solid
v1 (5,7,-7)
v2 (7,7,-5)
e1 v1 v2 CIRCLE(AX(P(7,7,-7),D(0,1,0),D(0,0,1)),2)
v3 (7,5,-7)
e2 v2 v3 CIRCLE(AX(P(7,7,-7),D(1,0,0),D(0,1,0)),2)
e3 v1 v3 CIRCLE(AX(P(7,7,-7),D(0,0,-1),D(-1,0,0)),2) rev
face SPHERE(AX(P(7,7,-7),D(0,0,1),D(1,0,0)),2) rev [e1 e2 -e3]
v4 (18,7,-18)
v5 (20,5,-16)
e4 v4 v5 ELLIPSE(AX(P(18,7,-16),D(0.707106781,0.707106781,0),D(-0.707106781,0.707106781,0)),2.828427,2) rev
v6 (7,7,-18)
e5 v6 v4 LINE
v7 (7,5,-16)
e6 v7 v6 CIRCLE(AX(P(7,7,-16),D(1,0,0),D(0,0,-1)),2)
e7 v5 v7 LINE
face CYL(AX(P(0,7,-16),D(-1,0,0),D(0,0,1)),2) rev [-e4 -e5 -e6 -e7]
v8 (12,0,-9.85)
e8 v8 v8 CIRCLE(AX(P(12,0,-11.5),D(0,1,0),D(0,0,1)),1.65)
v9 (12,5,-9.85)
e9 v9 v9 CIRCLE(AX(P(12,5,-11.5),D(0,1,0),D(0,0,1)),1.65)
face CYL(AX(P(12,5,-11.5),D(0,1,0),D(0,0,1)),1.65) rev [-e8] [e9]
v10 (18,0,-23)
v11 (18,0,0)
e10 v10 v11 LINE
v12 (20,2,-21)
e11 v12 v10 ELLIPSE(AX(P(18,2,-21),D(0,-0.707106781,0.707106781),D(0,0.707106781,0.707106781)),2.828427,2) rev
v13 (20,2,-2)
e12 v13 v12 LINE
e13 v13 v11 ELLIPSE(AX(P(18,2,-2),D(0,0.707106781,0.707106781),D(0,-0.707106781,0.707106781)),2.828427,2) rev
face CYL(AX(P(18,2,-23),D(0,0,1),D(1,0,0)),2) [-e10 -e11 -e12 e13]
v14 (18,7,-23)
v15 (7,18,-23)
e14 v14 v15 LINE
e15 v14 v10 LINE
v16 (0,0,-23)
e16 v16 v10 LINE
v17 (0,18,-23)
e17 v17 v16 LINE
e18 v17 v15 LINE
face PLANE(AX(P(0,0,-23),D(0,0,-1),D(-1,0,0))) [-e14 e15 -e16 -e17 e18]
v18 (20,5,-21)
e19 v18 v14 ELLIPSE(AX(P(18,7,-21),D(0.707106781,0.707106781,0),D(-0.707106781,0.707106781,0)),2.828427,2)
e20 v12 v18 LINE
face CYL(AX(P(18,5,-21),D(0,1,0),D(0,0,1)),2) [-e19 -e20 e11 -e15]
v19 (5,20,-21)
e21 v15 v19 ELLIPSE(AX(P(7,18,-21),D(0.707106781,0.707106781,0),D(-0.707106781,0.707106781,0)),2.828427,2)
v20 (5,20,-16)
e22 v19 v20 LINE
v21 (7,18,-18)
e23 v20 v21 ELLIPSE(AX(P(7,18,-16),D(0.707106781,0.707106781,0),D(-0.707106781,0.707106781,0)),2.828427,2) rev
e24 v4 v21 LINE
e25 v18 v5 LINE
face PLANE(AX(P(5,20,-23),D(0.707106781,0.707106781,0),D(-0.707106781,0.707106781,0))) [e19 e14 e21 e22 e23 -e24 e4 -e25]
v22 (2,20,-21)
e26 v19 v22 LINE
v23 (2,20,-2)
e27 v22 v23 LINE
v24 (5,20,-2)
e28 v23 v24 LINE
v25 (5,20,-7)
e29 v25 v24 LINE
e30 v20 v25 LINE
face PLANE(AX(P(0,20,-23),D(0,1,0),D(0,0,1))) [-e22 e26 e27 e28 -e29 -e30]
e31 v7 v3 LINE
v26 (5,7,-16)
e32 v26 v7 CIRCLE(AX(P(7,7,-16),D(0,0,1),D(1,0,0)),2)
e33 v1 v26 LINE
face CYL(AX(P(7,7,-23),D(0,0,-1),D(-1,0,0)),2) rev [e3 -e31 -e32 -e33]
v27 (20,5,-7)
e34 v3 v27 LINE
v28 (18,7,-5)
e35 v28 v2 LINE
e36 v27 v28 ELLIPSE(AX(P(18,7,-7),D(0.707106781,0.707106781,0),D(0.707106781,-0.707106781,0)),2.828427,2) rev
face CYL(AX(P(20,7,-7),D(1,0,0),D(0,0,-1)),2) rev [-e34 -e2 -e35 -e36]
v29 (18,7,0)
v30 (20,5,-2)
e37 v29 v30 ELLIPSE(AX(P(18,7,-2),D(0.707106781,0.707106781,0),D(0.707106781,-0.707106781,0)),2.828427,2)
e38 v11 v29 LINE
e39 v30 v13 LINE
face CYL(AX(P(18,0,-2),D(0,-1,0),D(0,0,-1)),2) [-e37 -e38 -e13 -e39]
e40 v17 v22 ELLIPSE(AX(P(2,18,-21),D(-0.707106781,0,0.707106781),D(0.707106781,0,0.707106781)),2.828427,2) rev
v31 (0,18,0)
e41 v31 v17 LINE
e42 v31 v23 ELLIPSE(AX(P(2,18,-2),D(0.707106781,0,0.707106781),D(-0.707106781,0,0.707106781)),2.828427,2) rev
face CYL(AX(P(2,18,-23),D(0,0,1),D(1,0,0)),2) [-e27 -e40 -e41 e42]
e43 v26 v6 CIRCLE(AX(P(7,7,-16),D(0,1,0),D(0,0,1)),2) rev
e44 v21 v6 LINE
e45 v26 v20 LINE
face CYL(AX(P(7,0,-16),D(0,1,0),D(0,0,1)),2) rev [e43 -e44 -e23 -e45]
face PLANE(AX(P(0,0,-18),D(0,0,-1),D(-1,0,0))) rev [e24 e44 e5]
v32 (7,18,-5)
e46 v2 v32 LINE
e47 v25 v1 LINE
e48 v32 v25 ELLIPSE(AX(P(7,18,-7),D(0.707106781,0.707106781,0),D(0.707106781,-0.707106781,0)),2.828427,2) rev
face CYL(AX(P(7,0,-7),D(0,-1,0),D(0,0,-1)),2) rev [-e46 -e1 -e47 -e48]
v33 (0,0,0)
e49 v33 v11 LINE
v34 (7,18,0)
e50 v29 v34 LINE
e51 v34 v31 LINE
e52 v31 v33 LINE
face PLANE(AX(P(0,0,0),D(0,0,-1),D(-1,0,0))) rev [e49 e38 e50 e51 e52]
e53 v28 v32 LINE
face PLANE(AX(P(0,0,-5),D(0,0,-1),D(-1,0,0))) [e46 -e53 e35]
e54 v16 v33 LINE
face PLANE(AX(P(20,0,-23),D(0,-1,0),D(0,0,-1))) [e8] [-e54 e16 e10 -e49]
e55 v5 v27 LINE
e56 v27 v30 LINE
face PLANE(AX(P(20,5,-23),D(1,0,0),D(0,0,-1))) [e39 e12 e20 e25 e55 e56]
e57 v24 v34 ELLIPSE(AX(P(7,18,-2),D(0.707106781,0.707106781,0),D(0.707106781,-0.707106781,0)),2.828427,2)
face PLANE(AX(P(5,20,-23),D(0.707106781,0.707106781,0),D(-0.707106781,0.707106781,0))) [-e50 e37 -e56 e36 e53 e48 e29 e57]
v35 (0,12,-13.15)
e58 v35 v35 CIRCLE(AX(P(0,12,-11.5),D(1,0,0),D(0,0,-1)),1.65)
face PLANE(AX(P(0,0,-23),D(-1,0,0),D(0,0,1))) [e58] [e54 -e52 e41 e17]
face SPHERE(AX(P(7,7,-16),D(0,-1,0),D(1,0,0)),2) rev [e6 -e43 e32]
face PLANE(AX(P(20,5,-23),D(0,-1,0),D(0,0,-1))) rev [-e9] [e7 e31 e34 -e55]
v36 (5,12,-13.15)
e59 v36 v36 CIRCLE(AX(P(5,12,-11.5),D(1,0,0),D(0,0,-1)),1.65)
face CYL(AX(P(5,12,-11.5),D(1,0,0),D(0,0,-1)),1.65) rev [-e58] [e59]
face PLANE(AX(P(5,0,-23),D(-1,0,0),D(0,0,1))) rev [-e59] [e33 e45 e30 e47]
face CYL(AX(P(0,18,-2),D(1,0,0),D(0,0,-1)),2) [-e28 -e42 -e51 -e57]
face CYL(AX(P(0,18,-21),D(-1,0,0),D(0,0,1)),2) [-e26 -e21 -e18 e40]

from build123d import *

# Parameters (mm, degrees)
BOSS_EXTRUDE2_DEPTH                   = 23
SHELL1_START                          = 5
SHELL1_OUTLINE_W                      = 16
SHELL1_OUTLINE_H                      = 13
SHELL1_DEPTH                          = 15
FILLET1_R                             = 2
FILLET3_R                             = 2
TAP_DRILL_FOR_M4X0_7_TAP1_D           = 3.3
TAP_DRILL_FOR_M4X0_7_TAP1_ON_FACE_2_D = 3.3


# Read off the part's stored shape, not the designer's step: Shell1
with BuildPart() as part:
    # Sketch1 → Boss-Extrude2 (new body)
    with BuildSketch(Plane.XY):
        Polygon((0, 0), (0, 20), (5, 20), (20, 5), (20, 0), align=None)
    extrude(amount=-BOSS_EXTRUDE2_DEPTH)

    # Shell1 outline → Shell1 (cut)
    with BuildSketch(Plane(origin=(0, 0, 0), x_dir=(1, 0, 0), z_dir=(0, 1, 0)).offset(SHELL1_START)):
        with Locations((13, 11.5)):
            Rectangle(SHELL1_OUTLINE_W, SHELL1_OUTLINE_H)
    extrude(amount=SHELL1_DEPTH, mode=Mode.SUBTRACT)

    # Fillet1
    fillet1_edges = [part.edges().sort_by_distance(p)[0] for p in [
        (12.5, 5, -18),
        (5, 12.5, -18),
        (5, 5, -11.5),
        (12.5, 5, -5),
        (5, 12.5, -5),
    ]]
    fillet(fillet1_edges, radius=FILLET1_R)

    # Fillet3
    fillet3_edges = [part.edges().sort_by_distance(p)[0] for p in [
        (2.5, 20, -23),
        (2.5, 20, 0),
        (20, 2.5, 0),
        (20, 2.5, -23),
        (0, 20, -11.5),
        (20, 0, -11.5),
    ]]
    fillet(fillet3_edges, radius=FILLET3_R)

    # Tap Drill for M4x0.7 Tap1 (through all)
    with Locations(Plane(origin=(5, 12, -11.5), x_dir=(0, 0, 1), z_dir=(1, 0, 0))):
        with Locations((0, 0)):
            Hole(TAP_DRILL_FOR_M4X0_7_TAP1_D / 2)

    # Tap Drill for M4x0.7 Tap1 on face 2 (through all)
    with Locations(Plane(origin=(12, 5, -11.5), x_dir=(0, 0, 1), z_dir=(0, 1, 0))):
        with Locations((0, 0)):
            Hole(TAP_DRILL_FOR_M4X0_7_TAP1_ON_FACE_2_D / 2)


solid = part.part
